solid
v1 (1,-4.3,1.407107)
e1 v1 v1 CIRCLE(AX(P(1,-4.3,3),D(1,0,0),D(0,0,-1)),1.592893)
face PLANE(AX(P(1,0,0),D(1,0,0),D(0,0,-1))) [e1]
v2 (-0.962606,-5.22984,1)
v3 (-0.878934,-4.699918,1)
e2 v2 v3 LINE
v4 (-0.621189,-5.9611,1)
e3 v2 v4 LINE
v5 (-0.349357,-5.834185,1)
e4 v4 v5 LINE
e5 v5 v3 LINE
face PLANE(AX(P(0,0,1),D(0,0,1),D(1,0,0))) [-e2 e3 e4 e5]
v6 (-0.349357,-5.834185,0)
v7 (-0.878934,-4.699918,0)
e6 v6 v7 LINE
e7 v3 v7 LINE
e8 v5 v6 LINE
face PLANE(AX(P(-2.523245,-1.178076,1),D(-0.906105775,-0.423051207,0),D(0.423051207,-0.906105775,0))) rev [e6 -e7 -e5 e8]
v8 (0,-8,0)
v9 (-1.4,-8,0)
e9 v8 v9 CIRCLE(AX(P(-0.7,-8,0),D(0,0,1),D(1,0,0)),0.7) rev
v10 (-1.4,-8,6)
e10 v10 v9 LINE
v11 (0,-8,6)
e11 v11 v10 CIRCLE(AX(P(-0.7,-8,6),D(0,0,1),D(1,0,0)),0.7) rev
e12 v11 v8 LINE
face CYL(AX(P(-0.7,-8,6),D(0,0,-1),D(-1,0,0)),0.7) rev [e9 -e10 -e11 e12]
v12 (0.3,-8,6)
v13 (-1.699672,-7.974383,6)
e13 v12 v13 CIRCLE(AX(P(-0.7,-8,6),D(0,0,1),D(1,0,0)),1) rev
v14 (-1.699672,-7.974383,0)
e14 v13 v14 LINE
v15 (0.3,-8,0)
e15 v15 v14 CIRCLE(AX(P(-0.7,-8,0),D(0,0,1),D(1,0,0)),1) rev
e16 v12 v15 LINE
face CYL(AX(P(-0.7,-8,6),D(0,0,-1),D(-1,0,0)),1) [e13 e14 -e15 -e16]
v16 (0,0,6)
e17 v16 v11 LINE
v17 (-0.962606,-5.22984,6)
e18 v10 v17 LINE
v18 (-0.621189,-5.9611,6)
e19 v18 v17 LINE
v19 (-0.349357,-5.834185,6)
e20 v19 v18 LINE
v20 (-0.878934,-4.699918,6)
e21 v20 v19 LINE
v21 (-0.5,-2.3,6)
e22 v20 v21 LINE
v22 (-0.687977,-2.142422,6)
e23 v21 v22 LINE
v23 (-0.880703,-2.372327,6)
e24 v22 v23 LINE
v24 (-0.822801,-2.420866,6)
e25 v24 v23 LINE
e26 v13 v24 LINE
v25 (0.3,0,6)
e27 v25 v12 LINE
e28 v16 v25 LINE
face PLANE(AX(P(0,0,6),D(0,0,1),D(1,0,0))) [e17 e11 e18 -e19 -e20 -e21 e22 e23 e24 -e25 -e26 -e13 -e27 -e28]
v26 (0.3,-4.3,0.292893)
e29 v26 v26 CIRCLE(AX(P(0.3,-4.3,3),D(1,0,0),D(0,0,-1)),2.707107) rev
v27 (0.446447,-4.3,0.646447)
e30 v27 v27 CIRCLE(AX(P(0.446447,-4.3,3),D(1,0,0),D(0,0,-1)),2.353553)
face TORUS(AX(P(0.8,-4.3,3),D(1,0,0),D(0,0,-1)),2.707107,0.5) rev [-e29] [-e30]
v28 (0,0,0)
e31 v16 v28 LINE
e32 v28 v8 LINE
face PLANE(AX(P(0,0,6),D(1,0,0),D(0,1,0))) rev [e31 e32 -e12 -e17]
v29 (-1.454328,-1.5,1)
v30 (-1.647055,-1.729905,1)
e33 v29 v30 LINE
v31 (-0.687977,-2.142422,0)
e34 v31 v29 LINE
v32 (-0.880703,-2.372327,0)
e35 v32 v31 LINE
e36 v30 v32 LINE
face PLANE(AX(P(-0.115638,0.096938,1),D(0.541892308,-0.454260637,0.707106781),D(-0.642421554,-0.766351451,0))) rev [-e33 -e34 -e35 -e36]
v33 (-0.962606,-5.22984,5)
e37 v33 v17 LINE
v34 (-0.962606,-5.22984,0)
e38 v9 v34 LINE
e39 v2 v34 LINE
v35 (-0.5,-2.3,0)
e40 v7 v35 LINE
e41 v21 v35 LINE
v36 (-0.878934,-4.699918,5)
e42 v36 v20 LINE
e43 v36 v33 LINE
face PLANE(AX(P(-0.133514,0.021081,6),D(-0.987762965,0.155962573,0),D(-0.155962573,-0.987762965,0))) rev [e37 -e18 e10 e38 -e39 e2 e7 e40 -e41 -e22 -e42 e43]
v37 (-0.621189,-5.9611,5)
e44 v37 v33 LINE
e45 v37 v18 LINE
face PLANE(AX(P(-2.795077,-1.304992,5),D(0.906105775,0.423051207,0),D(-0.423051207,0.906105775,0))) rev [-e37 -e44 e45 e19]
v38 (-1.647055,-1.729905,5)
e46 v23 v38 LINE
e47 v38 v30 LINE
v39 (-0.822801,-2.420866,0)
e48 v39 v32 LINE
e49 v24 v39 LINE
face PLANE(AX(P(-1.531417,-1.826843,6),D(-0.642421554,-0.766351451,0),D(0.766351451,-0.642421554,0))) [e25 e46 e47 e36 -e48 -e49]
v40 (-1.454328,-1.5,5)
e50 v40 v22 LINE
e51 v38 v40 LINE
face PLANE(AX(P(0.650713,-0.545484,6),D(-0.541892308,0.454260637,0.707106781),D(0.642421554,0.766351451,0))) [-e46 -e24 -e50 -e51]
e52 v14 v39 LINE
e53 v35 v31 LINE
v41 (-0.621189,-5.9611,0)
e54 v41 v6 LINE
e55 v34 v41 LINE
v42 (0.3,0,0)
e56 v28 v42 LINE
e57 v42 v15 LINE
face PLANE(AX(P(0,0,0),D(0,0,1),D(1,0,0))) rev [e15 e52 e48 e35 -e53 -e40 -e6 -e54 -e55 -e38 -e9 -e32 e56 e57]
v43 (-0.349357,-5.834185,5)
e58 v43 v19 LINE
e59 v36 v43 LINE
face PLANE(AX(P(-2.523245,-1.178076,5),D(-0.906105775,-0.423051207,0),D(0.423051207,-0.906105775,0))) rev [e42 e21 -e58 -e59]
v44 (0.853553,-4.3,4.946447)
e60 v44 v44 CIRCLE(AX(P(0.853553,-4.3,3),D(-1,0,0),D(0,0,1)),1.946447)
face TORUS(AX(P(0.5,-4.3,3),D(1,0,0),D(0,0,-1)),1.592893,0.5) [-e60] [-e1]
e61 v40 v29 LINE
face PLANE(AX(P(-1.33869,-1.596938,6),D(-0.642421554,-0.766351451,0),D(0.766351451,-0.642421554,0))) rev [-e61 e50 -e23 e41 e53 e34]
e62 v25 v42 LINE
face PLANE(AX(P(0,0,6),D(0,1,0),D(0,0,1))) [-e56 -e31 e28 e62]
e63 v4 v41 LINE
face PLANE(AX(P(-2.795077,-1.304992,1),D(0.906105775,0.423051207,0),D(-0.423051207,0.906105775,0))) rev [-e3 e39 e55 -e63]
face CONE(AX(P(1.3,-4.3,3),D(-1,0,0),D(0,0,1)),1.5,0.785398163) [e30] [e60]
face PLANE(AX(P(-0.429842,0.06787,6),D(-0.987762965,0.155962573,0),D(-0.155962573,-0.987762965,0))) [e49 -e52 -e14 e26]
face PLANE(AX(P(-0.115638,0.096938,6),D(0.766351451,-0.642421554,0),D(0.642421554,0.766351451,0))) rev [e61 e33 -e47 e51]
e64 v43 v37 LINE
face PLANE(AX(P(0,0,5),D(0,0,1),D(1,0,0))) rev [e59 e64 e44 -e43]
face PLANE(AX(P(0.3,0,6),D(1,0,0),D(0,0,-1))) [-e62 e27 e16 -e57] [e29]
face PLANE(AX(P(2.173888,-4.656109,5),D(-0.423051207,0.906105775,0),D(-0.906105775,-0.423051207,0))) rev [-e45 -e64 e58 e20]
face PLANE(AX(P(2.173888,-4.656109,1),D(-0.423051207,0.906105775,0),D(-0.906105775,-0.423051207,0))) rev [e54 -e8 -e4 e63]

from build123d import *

# Parameters (mm, degrees)
BOSS_EXTRUDE1_DEPTH = 6
CHAMFER1_SIZE       = 1
SKETCH2_R           = 1.5
BOSS_EXTRUDE2_DEPTH = 0.7
CHAMFER2_SIZE       = 1
FILLET1_R           = 0.5
BOSS_EXTRUDE3_DEPTH = 1
BOSS_EXTRUDE4_START = 6
BOSS_EXTRUDE4_DEPTH = 1


with BuildPart() as part:
    # Sketch1 → Boss-Extrude1 (new body)
    with BuildSketch(Plane.XY):
        with BuildLine():
            ThreePointArc((0.3, -8), (-0.712809438, -8.999917956), (-1.699671837, -7.974383226))
            Line((-1.699671837, -7.974383226), (-0.822800703, -2.420866047))
            Line((-0.822800703, -2.420866047), (-1.647054908, -1.729905435))
            Line((-1.647054908, -1.729905435), (-1.454328442, -1.5))
            Line((-1.454328442, -1.5), (-0.5, -2.3))
            Line((-0.5, -2.3), (-1.4, -8))
            ThreePointArc((-1.4, -8), (-0.7, -8.7), (0, -8))
            Line((0, -8), (0, 0))
            Line((0, 0), (0.3, 0))
            Line((0.3, 0), (0.3, -8))
        make_face()
    extrude(amount=BOSS_EXTRUDE1_DEPTH)

    # Chamfer1
    chamfer1_edges = [part.edges().sort_by_distance(p)[0] for p in [
        (-1.550691675, -1.614952718, 0),
        (-1.550691675, -1.614952718, 6),
    ]]
    chamfer(chamfer1_edges, length=CHAMFER1_SIZE)

    # Sketch2 → Boss-Extrude2 (add)
    with BuildSketch(Plane(origin=(0.3, 0, 0), x_dir=(0, 0, -1), z_dir=(1, 0, 0))):
        with Locations((-3, -4.3)):
            Circle(SKETCH2_R)
    extrude(amount=BOSS_EXTRUDE2_DEPTH)

    # Chamfer2
    # the kernel refuses this chamfer: 1 mm, written as the material it adds along each edge
    with BuildSketch(Plane(origin=(0.3, -4.3, 3), x_dir=(0, 0, -1), z_dir=(0, -1, 0))) as chamfer2_piece_1_section:
        Polygon((1.5 + CHAMFER2_SIZE, 0), (1.5, CHAMFER2_SIZE), (1.5, 0), align=None)
    chamfer2_piece_1 = revolve(axis=Axis((0.3, -4.3, 3), (1, 0, 0)), mode=Mode.PRIVATE)
    chamfer2_piece_1 = split(chamfer2_piece_1, bisect_by=Plane(origin=(1, -4.3, 5.151462954), z_dir=(-1, 0, 0)), keep=Keep.TOP, mode=Mode.PRIVATE)
    add(chamfer2_piece_1)

    # Fillet1
    fillet1_edges = [part.edges().sort_by_distance(p)[0] for p in [
        (0.3, -4.3, 5.5),
        (1, -4.3, 4.8),
    ]]
    fillet(fillet1_edges, radius=FILLET1_R)

    # Sketch1<3> → Boss-Extrude3 (add)
    with BuildSketch(Plane.XY):
        Polygon((-0.878934414, -4.699917956), (-0.962606384, -5.229840435), (-0.621188888, -5.961100292), (-0.349357155, -5.83418493), align=None)
    extrude(amount=BOSS_EXTRUDE3_DEPTH)

    # Sketch1<4> → Boss-Extrude4 (add)
    with BuildSketch(Plane.XY.offset(BOSS_EXTRUDE4_START)):
        Polygon((-0.878934414, -4.699917956), (-0.962606384, -5.229840435), (-0.621188888, -5.961100292), (-0.349357155, -5.83418493), align=None)
    extrude(amount=-BOSS_EXTRUDE4_DEPTH)


solid = part.part
